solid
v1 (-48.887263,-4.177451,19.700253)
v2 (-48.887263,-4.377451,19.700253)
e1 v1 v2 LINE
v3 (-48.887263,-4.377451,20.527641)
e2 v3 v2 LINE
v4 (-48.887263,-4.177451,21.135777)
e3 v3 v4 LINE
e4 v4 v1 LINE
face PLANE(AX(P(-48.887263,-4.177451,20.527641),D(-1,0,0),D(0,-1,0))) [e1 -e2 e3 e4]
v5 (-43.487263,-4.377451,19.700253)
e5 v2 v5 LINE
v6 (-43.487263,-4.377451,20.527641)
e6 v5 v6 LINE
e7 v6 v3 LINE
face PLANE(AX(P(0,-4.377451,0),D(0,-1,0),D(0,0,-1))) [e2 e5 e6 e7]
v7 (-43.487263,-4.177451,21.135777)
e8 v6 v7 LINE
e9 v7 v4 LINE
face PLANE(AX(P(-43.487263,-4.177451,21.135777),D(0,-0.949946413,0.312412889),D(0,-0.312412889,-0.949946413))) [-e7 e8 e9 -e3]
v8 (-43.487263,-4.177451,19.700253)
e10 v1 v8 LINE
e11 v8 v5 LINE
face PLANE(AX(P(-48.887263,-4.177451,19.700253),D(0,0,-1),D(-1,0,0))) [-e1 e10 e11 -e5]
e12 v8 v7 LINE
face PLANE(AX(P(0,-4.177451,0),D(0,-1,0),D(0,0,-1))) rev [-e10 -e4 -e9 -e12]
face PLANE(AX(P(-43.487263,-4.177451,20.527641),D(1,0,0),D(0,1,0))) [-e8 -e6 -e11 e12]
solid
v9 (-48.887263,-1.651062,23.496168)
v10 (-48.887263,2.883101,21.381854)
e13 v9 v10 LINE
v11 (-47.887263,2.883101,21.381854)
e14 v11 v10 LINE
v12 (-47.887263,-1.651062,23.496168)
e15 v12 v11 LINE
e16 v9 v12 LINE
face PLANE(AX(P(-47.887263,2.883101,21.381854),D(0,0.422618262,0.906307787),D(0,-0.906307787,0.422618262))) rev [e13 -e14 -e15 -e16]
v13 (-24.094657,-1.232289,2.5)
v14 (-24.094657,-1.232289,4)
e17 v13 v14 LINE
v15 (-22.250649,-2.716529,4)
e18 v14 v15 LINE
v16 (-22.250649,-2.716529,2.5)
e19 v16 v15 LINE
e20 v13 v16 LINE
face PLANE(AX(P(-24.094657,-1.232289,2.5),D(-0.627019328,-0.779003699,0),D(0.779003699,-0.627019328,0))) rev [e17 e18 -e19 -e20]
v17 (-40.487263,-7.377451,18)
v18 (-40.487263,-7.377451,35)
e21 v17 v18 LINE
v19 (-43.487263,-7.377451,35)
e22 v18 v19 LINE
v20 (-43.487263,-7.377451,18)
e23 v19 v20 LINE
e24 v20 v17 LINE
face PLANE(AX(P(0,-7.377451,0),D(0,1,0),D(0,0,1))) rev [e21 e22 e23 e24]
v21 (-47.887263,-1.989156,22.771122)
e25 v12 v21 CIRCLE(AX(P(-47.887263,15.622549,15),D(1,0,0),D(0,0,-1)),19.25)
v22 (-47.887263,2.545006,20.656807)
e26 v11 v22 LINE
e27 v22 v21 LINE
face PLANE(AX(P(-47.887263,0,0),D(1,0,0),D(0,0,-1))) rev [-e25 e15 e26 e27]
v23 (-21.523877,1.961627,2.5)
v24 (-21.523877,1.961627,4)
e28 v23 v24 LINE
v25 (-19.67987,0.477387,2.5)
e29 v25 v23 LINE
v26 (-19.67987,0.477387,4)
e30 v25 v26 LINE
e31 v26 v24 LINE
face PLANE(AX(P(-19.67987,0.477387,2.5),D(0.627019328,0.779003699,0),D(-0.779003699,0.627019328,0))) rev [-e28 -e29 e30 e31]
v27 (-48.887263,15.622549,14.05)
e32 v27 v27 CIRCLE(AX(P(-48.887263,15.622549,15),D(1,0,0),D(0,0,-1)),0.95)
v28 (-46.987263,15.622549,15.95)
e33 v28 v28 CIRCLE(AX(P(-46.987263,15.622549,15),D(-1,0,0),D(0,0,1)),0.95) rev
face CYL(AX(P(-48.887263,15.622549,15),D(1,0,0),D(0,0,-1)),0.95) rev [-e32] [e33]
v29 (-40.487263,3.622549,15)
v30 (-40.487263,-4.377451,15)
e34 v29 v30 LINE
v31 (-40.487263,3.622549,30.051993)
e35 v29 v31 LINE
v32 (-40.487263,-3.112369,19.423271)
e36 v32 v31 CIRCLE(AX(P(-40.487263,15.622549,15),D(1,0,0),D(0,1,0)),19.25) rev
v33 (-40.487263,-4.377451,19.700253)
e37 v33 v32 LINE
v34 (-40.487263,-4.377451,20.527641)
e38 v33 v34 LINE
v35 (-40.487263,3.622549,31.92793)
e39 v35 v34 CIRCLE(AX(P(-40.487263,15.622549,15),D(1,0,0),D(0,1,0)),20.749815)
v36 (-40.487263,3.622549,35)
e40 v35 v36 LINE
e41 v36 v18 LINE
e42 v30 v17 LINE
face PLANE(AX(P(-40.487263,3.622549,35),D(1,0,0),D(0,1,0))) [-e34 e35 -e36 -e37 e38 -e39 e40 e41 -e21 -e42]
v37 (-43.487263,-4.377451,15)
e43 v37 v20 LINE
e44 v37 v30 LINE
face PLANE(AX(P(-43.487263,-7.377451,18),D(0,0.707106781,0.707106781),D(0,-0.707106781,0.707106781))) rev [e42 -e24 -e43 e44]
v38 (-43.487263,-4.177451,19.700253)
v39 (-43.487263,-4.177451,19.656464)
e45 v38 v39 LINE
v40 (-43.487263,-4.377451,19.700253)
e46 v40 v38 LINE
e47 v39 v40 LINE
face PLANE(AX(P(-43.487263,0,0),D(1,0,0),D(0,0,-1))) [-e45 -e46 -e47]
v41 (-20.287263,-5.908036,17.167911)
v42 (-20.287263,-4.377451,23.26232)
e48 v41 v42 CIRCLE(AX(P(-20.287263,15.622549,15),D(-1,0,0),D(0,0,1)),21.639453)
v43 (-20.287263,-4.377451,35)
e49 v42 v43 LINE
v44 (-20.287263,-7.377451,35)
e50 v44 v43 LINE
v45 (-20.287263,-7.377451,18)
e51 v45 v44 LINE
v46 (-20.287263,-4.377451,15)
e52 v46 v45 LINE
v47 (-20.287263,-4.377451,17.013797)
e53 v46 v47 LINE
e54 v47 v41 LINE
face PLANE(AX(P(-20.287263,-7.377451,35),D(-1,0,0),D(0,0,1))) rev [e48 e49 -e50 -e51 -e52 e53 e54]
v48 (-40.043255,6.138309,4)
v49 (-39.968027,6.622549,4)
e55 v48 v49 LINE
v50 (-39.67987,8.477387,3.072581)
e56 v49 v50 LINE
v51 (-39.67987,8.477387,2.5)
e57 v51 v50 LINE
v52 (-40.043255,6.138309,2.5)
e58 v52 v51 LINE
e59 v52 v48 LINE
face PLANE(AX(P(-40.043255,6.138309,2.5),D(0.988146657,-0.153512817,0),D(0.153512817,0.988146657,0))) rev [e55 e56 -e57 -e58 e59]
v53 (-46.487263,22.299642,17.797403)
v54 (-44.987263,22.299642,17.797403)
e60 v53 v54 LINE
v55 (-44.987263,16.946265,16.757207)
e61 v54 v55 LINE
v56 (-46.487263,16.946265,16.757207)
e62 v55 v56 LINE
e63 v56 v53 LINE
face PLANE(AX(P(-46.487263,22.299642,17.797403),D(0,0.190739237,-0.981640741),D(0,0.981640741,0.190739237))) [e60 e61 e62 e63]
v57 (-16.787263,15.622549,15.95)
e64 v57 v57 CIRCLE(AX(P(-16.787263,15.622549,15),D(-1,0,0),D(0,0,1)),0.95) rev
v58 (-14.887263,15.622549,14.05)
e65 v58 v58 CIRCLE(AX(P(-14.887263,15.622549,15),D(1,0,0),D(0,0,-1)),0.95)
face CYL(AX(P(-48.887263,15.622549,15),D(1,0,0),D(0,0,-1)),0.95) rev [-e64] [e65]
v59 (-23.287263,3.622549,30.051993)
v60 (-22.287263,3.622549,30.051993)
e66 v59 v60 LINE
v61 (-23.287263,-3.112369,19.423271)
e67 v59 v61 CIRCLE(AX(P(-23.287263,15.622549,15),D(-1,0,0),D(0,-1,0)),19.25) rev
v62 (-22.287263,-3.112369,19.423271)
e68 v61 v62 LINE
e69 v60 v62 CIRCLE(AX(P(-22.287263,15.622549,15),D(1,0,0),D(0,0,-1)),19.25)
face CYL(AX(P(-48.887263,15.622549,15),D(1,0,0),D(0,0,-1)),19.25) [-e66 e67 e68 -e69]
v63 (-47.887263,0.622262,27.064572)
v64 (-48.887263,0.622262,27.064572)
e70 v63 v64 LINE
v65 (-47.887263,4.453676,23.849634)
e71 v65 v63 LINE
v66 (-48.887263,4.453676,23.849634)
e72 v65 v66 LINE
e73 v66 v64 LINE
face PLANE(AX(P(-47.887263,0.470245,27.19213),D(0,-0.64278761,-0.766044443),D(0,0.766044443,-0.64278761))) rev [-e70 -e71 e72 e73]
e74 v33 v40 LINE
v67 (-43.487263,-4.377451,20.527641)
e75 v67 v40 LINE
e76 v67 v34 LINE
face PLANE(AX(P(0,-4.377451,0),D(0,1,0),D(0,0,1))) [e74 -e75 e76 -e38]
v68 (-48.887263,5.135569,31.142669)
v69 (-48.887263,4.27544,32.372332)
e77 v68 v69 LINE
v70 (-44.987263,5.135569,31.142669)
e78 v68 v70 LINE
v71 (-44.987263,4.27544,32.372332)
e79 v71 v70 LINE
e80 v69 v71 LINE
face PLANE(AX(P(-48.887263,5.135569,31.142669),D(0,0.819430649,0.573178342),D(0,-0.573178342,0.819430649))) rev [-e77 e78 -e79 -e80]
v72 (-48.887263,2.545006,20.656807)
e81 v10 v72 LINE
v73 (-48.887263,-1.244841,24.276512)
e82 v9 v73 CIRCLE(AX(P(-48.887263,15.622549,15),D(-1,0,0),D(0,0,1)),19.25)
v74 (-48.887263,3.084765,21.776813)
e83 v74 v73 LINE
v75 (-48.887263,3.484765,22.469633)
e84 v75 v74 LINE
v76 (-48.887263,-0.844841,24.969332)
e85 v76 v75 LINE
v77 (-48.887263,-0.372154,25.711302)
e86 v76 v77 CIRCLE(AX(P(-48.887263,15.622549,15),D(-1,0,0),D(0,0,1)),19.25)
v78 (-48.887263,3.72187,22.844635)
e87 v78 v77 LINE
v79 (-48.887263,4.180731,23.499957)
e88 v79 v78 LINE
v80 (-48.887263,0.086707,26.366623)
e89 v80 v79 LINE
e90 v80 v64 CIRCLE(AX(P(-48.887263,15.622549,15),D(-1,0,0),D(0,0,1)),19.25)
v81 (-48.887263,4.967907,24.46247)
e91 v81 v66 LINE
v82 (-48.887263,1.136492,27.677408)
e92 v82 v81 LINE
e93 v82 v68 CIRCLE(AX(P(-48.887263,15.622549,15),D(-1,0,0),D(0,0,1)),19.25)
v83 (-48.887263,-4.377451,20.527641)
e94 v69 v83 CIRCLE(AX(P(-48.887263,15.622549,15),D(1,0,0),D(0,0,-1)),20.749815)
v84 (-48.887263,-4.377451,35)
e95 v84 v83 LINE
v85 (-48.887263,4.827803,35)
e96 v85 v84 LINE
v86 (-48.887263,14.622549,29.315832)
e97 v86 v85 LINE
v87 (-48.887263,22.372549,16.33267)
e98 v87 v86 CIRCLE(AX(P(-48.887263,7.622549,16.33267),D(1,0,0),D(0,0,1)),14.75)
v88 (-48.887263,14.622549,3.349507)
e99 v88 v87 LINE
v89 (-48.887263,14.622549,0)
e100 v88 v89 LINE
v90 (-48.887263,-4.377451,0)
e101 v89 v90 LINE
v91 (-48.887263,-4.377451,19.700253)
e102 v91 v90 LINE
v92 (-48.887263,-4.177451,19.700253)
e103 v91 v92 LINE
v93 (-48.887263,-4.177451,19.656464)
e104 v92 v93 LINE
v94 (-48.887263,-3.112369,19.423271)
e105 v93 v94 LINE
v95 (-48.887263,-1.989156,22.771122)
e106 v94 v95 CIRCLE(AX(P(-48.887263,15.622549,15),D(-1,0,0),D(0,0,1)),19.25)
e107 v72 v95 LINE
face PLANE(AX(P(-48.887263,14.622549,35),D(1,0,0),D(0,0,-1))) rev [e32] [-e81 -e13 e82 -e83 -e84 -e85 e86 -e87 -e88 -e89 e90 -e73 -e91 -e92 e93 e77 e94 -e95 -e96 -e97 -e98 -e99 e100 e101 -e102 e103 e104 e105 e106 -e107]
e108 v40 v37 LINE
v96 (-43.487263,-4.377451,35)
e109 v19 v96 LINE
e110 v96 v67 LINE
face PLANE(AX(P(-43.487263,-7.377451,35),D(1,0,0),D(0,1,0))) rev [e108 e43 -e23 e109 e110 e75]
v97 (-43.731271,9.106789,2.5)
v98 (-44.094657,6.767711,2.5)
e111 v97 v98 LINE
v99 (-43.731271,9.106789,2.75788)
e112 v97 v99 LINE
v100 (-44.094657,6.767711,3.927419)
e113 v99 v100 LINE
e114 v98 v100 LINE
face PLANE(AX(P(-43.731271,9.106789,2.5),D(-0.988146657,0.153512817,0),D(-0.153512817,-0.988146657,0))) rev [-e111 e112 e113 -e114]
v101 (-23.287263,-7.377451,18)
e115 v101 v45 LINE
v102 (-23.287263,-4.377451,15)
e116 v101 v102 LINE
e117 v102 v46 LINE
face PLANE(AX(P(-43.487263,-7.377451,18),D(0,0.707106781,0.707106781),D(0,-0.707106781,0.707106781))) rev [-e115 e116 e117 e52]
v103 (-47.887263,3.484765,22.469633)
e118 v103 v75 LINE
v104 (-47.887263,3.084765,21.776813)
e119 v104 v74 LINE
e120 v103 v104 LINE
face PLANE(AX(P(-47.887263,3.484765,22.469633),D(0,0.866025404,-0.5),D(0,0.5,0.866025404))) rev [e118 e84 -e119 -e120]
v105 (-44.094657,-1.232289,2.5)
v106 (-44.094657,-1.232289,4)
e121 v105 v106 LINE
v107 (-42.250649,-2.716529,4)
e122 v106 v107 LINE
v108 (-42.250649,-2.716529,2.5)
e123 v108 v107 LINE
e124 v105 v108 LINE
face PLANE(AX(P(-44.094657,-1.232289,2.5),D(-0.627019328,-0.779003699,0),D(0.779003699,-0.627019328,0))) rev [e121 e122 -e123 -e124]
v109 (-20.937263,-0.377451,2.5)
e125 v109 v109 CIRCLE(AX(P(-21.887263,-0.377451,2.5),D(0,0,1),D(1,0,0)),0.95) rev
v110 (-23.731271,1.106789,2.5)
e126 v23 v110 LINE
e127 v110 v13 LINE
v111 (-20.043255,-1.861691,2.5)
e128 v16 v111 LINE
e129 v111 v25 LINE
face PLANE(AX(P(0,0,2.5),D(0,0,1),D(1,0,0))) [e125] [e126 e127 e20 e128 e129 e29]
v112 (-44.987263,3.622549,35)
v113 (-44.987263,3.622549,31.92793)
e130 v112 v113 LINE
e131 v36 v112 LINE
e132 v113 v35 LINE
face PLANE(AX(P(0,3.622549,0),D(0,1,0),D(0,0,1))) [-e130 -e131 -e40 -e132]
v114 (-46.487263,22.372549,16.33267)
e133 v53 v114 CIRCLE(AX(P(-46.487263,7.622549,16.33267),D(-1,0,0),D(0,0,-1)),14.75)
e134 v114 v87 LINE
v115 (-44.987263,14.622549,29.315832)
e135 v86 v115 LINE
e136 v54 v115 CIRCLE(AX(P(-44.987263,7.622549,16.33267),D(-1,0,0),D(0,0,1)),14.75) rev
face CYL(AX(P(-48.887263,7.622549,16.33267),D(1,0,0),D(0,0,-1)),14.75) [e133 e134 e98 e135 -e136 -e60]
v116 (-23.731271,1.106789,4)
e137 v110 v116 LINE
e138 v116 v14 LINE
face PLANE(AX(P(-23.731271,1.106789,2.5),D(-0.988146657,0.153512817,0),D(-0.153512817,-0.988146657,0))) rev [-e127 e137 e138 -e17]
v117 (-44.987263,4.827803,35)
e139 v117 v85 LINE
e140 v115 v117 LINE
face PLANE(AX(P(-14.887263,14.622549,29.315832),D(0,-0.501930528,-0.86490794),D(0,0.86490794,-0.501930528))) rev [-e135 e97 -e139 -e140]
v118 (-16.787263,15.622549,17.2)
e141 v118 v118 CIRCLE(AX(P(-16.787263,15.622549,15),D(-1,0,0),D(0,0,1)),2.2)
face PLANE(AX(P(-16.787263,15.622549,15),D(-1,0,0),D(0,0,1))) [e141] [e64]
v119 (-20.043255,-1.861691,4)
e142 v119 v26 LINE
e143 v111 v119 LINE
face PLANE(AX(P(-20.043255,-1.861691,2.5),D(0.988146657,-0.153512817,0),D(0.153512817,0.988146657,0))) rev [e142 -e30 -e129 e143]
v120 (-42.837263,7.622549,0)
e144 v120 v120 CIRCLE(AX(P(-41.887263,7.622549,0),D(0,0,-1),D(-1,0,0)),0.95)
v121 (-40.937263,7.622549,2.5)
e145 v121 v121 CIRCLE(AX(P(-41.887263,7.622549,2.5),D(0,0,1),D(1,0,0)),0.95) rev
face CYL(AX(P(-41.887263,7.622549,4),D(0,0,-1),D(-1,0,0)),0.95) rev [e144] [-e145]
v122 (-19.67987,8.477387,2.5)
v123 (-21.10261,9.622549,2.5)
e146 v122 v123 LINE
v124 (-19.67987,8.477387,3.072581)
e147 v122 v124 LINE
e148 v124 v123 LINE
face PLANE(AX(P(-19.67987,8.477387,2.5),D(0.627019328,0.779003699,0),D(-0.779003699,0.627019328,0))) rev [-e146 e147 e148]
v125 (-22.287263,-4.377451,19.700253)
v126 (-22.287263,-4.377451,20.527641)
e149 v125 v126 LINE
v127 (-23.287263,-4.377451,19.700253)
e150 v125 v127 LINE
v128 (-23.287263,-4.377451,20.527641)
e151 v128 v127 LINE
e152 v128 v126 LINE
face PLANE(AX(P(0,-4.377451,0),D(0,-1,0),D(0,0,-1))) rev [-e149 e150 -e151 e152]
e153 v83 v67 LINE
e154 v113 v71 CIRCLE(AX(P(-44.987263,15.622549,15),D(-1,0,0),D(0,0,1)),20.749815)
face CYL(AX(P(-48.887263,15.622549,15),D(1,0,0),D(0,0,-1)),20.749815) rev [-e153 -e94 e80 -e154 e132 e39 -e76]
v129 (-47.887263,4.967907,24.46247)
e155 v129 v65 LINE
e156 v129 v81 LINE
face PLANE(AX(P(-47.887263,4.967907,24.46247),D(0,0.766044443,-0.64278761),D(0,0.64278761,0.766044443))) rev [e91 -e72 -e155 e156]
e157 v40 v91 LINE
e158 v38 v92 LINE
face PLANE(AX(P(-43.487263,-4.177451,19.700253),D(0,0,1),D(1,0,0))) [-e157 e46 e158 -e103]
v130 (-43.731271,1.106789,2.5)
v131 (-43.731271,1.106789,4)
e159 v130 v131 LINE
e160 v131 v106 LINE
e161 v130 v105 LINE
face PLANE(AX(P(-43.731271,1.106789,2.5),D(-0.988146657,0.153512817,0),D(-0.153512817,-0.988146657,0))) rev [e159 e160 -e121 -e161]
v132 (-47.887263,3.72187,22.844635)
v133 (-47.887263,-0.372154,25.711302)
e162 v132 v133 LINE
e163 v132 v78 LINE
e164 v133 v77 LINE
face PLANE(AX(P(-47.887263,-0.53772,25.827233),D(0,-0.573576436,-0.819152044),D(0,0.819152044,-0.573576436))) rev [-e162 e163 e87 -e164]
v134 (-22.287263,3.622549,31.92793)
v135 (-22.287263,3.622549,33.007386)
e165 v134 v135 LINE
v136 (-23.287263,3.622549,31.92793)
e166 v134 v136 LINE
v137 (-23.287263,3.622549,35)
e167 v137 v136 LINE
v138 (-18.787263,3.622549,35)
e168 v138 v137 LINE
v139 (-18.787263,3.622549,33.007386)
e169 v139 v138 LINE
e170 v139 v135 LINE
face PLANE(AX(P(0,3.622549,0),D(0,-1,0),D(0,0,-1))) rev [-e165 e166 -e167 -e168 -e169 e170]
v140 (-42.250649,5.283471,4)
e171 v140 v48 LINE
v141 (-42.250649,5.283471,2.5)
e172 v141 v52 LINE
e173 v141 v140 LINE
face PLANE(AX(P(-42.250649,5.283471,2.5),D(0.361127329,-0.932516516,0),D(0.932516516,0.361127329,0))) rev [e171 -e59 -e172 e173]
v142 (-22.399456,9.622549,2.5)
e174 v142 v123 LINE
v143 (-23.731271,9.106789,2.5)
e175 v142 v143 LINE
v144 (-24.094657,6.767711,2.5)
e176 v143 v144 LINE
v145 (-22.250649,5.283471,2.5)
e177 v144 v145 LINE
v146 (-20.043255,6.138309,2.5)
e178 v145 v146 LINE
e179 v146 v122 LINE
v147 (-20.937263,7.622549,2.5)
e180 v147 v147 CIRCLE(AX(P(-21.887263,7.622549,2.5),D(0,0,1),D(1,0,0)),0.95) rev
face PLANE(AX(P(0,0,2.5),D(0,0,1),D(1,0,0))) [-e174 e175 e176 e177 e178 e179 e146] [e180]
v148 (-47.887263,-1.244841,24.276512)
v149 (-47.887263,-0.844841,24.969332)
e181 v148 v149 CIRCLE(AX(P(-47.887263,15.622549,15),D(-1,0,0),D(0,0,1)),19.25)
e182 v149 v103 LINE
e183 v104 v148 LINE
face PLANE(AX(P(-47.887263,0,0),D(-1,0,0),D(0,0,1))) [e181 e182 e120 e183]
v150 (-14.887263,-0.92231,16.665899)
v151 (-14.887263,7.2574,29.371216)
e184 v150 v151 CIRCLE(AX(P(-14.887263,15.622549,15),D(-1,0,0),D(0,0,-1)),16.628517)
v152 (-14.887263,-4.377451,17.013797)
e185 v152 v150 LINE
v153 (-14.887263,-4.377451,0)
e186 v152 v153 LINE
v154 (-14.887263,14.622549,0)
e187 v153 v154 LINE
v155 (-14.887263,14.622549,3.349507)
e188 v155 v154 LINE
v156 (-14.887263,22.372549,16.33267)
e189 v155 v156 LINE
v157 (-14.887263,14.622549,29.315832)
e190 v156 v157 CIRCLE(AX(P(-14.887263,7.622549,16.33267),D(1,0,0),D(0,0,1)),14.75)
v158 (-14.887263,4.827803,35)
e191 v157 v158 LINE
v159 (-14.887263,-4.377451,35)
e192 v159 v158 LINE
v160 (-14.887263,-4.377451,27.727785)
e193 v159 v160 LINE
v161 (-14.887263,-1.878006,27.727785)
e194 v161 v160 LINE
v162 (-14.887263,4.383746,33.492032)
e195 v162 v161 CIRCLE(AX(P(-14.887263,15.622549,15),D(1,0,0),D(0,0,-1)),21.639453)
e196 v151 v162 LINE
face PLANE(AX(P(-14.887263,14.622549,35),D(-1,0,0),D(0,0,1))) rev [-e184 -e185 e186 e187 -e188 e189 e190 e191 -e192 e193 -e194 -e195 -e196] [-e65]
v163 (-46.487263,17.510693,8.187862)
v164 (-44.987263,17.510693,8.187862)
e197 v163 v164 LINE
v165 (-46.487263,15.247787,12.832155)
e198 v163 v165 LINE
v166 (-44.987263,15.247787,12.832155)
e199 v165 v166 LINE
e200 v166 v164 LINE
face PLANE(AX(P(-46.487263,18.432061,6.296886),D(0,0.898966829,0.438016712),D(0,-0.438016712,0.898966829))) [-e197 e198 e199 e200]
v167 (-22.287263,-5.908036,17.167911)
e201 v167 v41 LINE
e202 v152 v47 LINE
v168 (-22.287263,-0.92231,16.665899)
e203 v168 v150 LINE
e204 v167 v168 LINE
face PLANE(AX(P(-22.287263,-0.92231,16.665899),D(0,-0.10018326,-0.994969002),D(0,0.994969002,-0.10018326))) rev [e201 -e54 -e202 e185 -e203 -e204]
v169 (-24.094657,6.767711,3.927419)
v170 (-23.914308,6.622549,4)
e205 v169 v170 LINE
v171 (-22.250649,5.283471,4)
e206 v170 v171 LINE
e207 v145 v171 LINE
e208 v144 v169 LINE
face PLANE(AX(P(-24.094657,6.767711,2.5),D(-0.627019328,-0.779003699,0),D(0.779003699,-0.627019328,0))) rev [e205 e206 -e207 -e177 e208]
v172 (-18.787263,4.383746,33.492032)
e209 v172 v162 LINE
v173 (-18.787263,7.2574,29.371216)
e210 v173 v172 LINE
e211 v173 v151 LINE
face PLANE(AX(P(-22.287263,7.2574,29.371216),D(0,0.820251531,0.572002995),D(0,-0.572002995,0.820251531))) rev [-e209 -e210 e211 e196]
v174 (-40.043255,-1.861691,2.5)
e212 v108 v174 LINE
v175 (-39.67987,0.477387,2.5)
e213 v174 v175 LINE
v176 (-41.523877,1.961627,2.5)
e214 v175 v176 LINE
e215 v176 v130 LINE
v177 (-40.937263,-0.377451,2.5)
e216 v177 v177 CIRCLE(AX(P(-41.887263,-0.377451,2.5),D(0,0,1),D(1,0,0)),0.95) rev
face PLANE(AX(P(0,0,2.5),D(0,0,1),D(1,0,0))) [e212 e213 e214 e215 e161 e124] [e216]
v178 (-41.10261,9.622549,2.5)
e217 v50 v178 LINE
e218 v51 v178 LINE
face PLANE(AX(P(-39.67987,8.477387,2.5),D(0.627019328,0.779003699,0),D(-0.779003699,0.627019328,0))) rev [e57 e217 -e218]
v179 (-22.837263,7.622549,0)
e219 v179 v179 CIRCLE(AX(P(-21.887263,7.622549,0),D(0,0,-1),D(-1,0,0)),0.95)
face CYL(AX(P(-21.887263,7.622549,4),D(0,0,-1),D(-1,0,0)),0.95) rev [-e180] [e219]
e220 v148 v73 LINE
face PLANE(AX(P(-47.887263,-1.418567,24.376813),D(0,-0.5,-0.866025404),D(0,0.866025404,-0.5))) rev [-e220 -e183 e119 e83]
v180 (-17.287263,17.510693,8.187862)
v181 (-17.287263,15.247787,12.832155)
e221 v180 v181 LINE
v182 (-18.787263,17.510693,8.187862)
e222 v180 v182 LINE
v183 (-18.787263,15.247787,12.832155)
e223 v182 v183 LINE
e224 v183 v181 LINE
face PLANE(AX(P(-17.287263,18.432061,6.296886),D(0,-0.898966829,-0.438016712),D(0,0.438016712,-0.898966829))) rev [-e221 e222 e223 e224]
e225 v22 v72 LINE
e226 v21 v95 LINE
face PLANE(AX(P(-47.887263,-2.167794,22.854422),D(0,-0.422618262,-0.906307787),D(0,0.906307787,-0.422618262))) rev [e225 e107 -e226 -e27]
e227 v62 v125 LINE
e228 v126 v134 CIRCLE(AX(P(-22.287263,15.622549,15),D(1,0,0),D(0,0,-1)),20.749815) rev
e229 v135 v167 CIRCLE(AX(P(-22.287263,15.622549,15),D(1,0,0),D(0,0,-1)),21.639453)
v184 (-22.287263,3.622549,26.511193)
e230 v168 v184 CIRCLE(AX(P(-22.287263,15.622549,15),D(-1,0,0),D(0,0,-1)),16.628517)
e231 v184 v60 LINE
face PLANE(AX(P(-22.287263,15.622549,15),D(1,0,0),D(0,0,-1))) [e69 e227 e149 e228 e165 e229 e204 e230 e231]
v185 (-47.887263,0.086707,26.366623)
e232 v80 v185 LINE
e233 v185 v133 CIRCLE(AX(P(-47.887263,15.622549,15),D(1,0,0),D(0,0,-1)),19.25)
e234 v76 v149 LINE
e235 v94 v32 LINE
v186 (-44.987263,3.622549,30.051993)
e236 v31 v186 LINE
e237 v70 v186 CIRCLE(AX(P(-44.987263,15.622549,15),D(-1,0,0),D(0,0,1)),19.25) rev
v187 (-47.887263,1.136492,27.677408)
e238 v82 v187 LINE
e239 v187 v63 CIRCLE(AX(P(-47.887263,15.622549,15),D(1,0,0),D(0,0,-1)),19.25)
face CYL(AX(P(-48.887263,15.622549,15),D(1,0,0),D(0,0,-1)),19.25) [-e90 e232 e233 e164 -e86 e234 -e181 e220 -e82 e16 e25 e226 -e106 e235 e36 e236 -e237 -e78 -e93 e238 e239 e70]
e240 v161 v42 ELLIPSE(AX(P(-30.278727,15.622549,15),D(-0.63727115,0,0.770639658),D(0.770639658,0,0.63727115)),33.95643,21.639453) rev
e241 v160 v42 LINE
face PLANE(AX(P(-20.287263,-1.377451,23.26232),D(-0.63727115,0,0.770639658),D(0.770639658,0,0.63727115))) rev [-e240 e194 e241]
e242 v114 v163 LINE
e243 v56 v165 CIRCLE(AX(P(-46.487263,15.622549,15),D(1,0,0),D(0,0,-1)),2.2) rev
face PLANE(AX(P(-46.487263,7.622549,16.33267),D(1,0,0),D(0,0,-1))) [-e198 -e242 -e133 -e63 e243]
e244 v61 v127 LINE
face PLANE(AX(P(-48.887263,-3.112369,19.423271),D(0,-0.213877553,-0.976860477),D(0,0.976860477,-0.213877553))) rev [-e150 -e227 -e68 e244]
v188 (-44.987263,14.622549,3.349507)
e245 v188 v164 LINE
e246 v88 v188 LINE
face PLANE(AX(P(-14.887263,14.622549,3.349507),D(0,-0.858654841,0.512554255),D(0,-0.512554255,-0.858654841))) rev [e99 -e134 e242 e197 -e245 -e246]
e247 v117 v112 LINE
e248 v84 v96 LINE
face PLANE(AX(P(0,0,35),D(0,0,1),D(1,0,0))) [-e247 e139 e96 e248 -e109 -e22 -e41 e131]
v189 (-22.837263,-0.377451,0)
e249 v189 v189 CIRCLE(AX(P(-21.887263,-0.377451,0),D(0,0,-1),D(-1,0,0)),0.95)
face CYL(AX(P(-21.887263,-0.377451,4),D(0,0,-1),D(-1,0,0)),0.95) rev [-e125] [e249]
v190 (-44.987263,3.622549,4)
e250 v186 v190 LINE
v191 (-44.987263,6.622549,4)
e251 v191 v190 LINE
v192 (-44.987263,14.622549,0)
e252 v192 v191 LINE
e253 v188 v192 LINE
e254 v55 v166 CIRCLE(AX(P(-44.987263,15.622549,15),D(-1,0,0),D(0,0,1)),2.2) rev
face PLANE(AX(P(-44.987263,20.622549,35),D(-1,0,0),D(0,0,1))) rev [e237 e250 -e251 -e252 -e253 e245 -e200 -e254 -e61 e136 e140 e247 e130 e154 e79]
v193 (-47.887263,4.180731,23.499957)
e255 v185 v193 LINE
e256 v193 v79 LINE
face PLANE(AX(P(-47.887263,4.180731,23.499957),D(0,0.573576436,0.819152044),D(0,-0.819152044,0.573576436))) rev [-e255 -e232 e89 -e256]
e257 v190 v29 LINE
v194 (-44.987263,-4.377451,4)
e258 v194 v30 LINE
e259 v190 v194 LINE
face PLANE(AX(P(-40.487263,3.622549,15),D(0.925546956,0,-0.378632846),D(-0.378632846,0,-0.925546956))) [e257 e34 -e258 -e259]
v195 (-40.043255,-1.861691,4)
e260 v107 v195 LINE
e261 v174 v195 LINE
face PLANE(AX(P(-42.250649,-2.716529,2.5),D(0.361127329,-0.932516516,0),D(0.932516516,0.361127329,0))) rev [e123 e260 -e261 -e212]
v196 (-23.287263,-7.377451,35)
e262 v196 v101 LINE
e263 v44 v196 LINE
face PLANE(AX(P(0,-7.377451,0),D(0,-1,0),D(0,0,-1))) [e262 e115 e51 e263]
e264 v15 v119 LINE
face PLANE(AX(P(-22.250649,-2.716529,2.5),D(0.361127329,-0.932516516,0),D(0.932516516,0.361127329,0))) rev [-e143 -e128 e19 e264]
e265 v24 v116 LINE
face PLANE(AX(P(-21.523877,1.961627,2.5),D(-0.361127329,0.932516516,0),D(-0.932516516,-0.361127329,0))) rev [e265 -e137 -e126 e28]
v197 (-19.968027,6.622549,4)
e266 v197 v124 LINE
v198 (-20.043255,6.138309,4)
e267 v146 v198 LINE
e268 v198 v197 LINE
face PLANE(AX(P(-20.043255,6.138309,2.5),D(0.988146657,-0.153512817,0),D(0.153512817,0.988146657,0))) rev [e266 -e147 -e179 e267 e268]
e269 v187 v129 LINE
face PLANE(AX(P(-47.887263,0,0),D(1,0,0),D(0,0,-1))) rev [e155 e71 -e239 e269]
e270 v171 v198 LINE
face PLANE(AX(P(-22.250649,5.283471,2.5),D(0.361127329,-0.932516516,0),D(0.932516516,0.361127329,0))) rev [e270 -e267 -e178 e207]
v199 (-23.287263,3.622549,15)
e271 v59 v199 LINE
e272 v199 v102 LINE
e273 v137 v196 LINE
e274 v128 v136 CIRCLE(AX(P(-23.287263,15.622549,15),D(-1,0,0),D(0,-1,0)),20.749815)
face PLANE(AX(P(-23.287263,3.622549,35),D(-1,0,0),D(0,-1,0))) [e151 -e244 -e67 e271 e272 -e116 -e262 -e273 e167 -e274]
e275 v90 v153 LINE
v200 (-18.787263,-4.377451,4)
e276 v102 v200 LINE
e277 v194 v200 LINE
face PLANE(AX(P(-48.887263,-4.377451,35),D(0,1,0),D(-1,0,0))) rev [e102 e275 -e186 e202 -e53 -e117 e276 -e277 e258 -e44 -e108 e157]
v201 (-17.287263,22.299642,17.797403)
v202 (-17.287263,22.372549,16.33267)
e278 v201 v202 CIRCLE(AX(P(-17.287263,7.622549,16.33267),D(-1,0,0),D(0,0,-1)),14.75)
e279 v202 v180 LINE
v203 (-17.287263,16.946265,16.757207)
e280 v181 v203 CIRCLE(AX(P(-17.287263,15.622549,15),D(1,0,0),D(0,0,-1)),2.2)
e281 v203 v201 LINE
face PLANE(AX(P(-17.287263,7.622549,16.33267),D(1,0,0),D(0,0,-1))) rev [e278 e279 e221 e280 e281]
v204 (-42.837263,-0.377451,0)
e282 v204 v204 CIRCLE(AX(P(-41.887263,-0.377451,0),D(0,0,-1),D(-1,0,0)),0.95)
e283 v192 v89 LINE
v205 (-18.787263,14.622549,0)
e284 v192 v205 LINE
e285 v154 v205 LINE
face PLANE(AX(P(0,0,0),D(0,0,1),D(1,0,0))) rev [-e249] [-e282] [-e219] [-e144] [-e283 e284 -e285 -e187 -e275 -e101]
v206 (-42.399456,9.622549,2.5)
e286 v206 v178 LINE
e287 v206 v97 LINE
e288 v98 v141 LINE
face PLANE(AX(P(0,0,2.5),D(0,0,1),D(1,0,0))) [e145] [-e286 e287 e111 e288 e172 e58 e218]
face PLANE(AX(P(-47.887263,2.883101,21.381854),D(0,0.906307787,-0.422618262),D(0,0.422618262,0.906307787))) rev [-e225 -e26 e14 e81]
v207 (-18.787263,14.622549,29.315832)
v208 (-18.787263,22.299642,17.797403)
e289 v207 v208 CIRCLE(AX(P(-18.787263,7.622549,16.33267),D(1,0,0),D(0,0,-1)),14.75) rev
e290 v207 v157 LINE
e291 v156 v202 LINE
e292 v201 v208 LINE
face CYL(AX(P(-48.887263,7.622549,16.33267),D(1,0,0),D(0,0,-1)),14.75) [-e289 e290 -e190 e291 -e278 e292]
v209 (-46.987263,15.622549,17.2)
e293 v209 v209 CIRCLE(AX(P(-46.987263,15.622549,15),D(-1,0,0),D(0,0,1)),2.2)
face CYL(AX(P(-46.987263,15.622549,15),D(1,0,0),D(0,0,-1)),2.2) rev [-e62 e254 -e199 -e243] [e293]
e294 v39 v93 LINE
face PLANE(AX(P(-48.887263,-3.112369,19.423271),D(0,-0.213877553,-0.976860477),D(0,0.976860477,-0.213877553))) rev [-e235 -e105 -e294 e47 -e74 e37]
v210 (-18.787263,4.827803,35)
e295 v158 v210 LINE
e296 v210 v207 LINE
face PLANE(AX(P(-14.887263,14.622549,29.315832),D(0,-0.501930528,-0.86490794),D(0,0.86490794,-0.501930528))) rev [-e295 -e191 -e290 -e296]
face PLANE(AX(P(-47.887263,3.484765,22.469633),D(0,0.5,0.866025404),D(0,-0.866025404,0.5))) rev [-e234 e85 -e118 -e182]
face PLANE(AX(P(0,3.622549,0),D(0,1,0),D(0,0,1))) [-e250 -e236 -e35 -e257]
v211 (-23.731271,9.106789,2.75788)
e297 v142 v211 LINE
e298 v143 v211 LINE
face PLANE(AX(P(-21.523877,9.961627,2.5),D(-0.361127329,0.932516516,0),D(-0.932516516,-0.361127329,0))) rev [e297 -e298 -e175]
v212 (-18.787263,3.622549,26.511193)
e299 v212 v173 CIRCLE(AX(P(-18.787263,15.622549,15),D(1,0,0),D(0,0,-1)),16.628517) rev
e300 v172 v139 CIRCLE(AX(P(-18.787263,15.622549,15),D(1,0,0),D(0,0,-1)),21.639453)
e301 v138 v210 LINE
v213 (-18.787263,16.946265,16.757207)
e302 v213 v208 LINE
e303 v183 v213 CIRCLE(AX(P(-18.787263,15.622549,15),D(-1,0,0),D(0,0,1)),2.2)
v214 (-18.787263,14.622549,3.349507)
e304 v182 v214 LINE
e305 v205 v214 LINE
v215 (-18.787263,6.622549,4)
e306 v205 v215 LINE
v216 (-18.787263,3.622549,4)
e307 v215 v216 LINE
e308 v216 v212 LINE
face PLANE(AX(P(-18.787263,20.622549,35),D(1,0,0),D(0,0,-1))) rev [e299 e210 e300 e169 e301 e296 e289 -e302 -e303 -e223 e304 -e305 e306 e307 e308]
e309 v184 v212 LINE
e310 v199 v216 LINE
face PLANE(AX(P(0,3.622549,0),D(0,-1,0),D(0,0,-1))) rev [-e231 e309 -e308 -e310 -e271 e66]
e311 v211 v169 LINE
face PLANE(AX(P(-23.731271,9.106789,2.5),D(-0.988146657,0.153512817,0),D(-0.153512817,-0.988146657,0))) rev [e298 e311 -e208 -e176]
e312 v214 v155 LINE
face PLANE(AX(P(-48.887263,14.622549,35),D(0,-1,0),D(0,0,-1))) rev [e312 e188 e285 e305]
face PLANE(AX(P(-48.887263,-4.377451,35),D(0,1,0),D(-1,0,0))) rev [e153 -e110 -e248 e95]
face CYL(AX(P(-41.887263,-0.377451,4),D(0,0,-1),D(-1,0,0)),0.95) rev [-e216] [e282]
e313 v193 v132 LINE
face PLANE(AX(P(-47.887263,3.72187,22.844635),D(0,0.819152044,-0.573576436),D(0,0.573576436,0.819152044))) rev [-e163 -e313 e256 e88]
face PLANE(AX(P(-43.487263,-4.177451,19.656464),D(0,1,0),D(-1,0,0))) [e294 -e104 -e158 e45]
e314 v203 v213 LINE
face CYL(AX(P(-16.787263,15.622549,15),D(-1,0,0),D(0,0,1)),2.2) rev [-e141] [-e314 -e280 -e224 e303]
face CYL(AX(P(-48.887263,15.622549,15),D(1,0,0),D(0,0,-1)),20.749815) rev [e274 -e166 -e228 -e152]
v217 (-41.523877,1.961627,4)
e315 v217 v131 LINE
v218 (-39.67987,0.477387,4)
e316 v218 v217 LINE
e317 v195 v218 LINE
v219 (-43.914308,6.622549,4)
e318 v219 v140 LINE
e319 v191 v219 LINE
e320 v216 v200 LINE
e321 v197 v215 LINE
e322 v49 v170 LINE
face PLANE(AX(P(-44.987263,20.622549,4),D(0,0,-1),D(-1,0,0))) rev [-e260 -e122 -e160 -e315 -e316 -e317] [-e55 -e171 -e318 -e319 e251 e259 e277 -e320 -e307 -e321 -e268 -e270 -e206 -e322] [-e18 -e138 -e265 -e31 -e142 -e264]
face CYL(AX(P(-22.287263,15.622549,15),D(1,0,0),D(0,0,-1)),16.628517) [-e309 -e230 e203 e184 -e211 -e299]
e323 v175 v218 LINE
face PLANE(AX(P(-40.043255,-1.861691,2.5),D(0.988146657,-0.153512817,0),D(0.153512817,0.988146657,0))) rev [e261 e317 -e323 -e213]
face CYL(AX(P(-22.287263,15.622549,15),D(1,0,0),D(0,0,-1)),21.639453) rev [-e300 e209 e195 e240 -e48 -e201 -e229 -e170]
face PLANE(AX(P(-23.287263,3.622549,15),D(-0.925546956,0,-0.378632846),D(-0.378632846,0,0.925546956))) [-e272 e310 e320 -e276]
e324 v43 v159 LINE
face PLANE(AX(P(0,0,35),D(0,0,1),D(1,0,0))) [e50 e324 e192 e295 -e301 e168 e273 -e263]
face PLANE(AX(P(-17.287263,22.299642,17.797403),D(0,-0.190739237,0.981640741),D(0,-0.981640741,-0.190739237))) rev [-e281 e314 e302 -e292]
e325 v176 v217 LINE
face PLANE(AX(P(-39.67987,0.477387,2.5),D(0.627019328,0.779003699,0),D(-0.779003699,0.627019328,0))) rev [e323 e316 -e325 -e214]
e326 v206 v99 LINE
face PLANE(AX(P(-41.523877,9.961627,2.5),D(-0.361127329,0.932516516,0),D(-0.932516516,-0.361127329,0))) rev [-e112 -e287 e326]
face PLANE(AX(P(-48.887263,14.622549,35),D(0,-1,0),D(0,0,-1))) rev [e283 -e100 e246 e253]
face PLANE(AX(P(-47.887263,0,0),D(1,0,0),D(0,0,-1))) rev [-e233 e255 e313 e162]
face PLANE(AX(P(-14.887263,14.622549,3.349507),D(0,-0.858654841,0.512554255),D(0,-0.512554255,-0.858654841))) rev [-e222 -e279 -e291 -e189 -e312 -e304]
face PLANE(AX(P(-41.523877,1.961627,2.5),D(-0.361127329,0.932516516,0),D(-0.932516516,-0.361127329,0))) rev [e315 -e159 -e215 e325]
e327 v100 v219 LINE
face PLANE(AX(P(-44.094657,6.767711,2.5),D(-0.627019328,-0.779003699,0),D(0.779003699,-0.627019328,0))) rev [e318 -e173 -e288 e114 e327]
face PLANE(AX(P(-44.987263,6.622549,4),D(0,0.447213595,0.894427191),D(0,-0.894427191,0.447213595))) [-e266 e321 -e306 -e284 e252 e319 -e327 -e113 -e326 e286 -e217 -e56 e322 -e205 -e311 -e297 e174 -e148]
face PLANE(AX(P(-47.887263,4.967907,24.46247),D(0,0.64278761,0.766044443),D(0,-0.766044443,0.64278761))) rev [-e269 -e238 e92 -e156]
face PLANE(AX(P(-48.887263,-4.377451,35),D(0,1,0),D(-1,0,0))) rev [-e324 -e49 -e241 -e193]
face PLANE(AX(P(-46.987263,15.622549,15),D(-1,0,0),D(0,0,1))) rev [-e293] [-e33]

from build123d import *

# Parameters (mm, degrees)
CROQUIS1_W                = 34
CROQUIS1_H                = 19
SALIENTE_EXTRUIR1_DEPTH   = 35
CROQUIS2_W                = 26.2
CROQUIS2_H                = 31
CORTAR_EXTRUIR1_DEPTH     = 25
CORTAR_EXTRUIR3_DEPTH     = 26.2
SALIENTE_EXTRUIR2_DEPTH   = 34
CROQUIS10_W               = 26.2
CROQUIS10_H               = 25.966324345
CORTAR_EXTRUIR4_DEPTH     = 10
CROQUIS18_R               = 0.95
CORTAR_EXTRUIR11_DEPTH    = 4
CORTAR_EXTRUIR12_DEPTH    = 1.5
CORTAR_EXTRUIR14_START    = -34
CROQUIS21_R               = 0.95
CORTAR_EXTRUIR14_DEPTH    = 34
SALIENTE_EXTRUIR3_DEPTH   = 8
CORTAR_EXTRUIR16_START    = -34
CORTAR_EXTRUIR16_DEPTH    = 34
CROQUIS25_W               = 3
CROQUIS25_H               = 20
SALIENTE_EXTRUIR4_DEPTH   = 3
CORTAR_EXTRUIR17_START    = -23.2
CORTAR_EXTRUIR17_DEPTH    = 23.2
CORTAR_EXTRUIR18_DEPTH    = 7.4
CORTAR_EXTRUIR20_START    = -1.5
CORTAR_EXTRUIR20_DEPTH    = 1.5
CORTAR_EXTRUIR21_DEPTH    = 27.7
CORTAR_EXTRUIR22_START    = -34
CORTAR_EXTRUIR22_DEPTH    = 34
CROQUIS33_W               = 5.4
CROQUIS33_H               = 0.827388273
SALIENTE_EXTRUIR5_DEPTH   = 0.2
SALIENTE_EXTRUIR6_START   = -5.4
SALIENTE_EXTRUIR6_DEPTH   = 5.4
SALIENTE_EXTRUIR6_2_DEPTH = 5.4
CORTAR_EXTRUIR23_DEPTH    = 3
CROQUIS36_R               = 2.2
CORTAR_EXTRUIR24_DEPTH    = 2
CORTAR_EXTRUIR25_START    = 28.2
CROQUIS36_2_R             = 2.2
CORTAR_EXTRUIR25_DEPTH    = 28.2
CORTAR_EXTRUIR26_START    = -34
CORTAR_EXTRUIR26_DEPTH    = 34
CORTAR_EXTRUIR27_DEPTH    = 1


# Read off the part's stored shape, not the designer's step: Saliente-Extruir6
with BuildPart() as part:
    # Croquis1 → Saliente-Extruir1 (new body)
    with BuildSketch(Plane.XY):
        with Locations((-31.887263086, 5.12254902)):
            Rectangle(CROQUIS1_W, CROQUIS1_H)
    extrude(amount=SALIENTE_EXTRUIR1_DEPTH)

    # Croquis2 → Cortar-Extruir1 (cut)
    with BuildSketch(Plane.XZ.offset(4.37745098)):
        with Locations((-31.887263086, 19.5)):
            Rectangle(CROQUIS2_W, CROQUIS2_H)
    extrude(amount=-CORTAR_EXTRUIR1_DEPTH, mode=Mode.SUBTRACT)

    # Croquis4 → Cortar-Extruir3 (cut)
    with BuildSketch(Plane.ZY.offset(18.787263086)):
        Polygon((4, 14.62254902), (4, 6.62254902), (0, 14.62254902), align=None)
    extrude(amount=CORTAR_EXTRUIR3_DEPTH, mode=Mode.SUBTRACT)

    # Croquis9 → Saliente-Extruir2 (add)
    with BuildSketch(Plane(origin=(-14.887263086, 0, 0), x_dir=(0, 0, -1), z_dir=(1, 0, 0))):
        with BuildLine():
            Line((-29.315831827, 14.62254902), (-3.349507482, 14.62254902))
            ThreePointArc((-3.349507482, 14.62254902), (-16.332669655, 22.37254902), (-29.315831827, 14.62254902))
        make_face()
    extrude(amount=-SALIENTE_EXTRUIR2_DEPTH)

    # Croquis10 → Cortar-Extruir4 (cut)
    with BuildSketch(Plane.XZ.offset(-14.62254902)):
        with Locations((-31.887263086, 16.332669655)):
            Rectangle(CROQUIS10_W, CROQUIS10_H)
    extrude(amount=-CORTAR_EXTRUIR4_DEPTH, mode=Mode.SUBTRACT)

    # Croquis18 → Cortar-Extruir11 (cut)
    with BuildSketch(Plane(origin=(0, 0, 0), x_dir=(-1, 0, 0), z_dir=(0, 0, -1))):
        with Locations((41.887263086, -0.37745098)):
            Circle(CROQUIS18_R)
        with Locations((21.887263086, -0.37745098)):
            Circle(CROQUIS18_R)
        with Locations((21.887263086, 7.62254902)):
            Circle(CROQUIS18_R)
        with Locations((41.887263086, 7.62254902)):
            Circle(CROQUIS18_R)
    extrude(amount=-CORTAR_EXTRUIR11_DEPTH, mode=Mode.SUBTRACT)

    # Croquis19 → Cortar-Extruir12 (cut)
    with BuildSketch(Plane.XY.offset(4)):
        Polygon((-43.731270866, 1.106789108), (-44.094656598, -1.232288518), (-42.250648818, -2.716528607), (-40.043255306, -1.861691069), (-39.679869573, 0.477386558), (-41.523877353, 1.961626646), align=None)
        Polygon((-23.731270866, 1.106789108), (-24.094656598, -1.232288518), (-22.250648818, -2.716528607), (-20.043255306, -1.861691069), (-19.679869573, 0.477386558), (-21.523877353, 1.961626646), align=None)
        Polygon((-43.731270866, 9.106789108), (-44.094656598, 6.767711482), (-42.250648818, 5.283471393), (-40.043255306, 6.138308931), (-39.679869573, 8.477386558), (-41.523877353, 9.961626646), align=None)
        Polygon((-23.731270866, 9.106789108), (-24.094656598, 6.767711482), (-22.250648818, 5.283471393), (-20.043255306, 6.138308931), (-19.679869573, 8.477386558), (-21.523877353, 9.961626646), align=None)
    extrude(amount=-CORTAR_EXTRUIR12_DEPTH, mode=Mode.SUBTRACT)

    # Croquis21 → Cortar-Extruir14 (cut)
    with BuildSketch(Plane(origin=(-14.887263086, 0, 0), x_dir=(0, 0, -1), z_dir=(1, 0, 0)).offset(CORTAR_EXTRUIR14_START)):
        with Locations((-15, 15.62254902)):
            Circle(CROQUIS21_R)
    extrude(amount=CORTAR_EXTRUIR14_DEPTH, mode=Mode.SUBTRACT)

    # Croquis23 → Saliente-Extruir3 (add)
    with BuildSketch(Plane.XZ.offset(4.37745098)):
        Polygon((-44.987263086, 35), (-40.487263086, 35), (-40.487263086, 15), (-44.987263086, 4), align=None)
        Polygon((-18.787263086, 35), (-23.287263086, 35), (-23.287263086, 15), (-18.787263086, 4), align=None)
    extrude(amount=-SALIENTE_EXTRUIR3_DEPTH)

    # Croquis24 → Cortar-Extruir16 (cut)
    with BuildSketch(Plane(origin=(-14.887263086, 0, 0), x_dir=(0, 0, -1), z_dir=(1, 0, 0)).offset(CORTAR_EXTRUIR16_START)):
        with BuildLine():
            Line((-19.423271375, -3.112369457), (-19.744087704, -4.577660174))
            ThreePointArc((-19.744087704, -4.577660174), (-26.911270078, -1.367932572), (-32.372332418, 4.275439874))
            Line((-32.372332418, 4.275439874), (-31.142668885, 5.135569413))
            ThreePointArc((-31.142668885, 5.135569413), (-26.079106399, -0.119620507), (-19.423271375, -3.112369457))
        make_face()
    extrude(amount=CORTAR_EXTRUIR16_DEPTH, mode=Mode.SUBTRACT)

    # Croquis25 → Saliente-Extruir4 (add)
    with BuildSketch(Plane.XZ.offset(4.37745098)):
        with Locations((-21.787263086, 25)):
            Rectangle(CROQUIS25_W, CROQUIS25_H)
        with Locations((-41.987263086, 25)):
            Rectangle(CROQUIS25_W, CROQUIS25_H)
    extrude(amount=SALIENTE_EXTRUIR4_DEPTH)

    # Croquis26 → Cortar-Extruir17 (cut)
    with BuildSketch(Plane(origin=(-20.287263086, 0, 0), x_dir=(0, 0, -1), z_dir=(1, 0, 0)).offset(CORTAR_EXTRUIR17_START)):
        Polygon((-18, -7.37745098), (-15, -7.37745098), (-15, -4.37745098), align=None)
    extrude(amount=CORTAR_EXTRUIR17_DEPTH, mode=Mode.SUBTRACT)

    # Croquis27 → Cortar-Extruir18 (cut)
    with BuildSketch(Plane(origin=(-14.887263086, 0, 0), x_dir=(0, 0, -1), z_dir=(1, 0, 0))):
        with BuildLine():
            Line((-16.665899018, -0.922309645), (-17.167910976, -5.908036155))
            ThreePointArc((-17.167910976, -5.908036155), (-26.540732538, -2.68257126), (-33.492032026, 4.383746258))
            Line((-33.492032026, 4.383746258), (-29.371216121, 7.25740019))
            ThreePointArc((-29.371216121, 7.25740019), (-24.001343163, 1.641011586), (-16.665899018, -0.922309645))
        make_face()
    extrude(amount=-CORTAR_EXTRUIR18_DEPTH, mode=Mode.SUBTRACT)

    # Croquis29 → Cortar-Extruir20 (cut)
    with BuildSketch(Plane.ZY.offset(18.787263086).offset(CORTAR_EXTRUIR20_START)):
        with BuildLine():
            Line((17.797402962, 22.299641931), (16.5, 15.62254902))
            ThreePointArc((16.5, 15.62254902), (15.426958984, 14.184596995), (13.743058632, 14.803953638))
            Line((13.743058632, 14.803953638), (6.296886003, 18.432060872))
            ThreePointArc((6.296886003, 18.432060872), (11.631045274, 21.603150873), (17.797402962, 22.299641931))
        make_face()
    extrude(amount=CORTAR_EXTRUIR20_DEPTH, mode=Mode.SUBTRACT)

    # Croquis29<2> → Cortar-Extruir21 (cut)
    with BuildSketch(Plane.ZY.offset(18.787263086)):
        with BuildLine():
            Line((17.797402962, 22.299641931), (16.5, 15.62254902))
            ThreePointArc((16.5, 15.62254902), (15.426958984, 14.184596995), (13.743058632, 14.803953638))
            Line((13.743058632, 14.803953638), (6.296886003, 18.432060872))
            ThreePointArc((6.296886003, 18.432060872), (11.631045274, 21.603150873), (17.797402962, 22.299641931))
        make_face()
    extrude(amount=CORTAR_EXTRUIR21_DEPTH, mode=Mode.SUBTRACT)

    # Croquis30 → Cortar-Extruir22 (cut)
    with BuildSketch(Plane.ZY.offset(48.887263086).offset(CORTAR_EXTRUIR22_START)):
        Polygon((29.315831827, 14.62254902), (35, 4.827802707), (35, 14.62254902), align=None)
    extrude(amount=CORTAR_EXTRUIR22_DEPTH, mode=Mode.SUBTRACT)

    # Saliente-Extruir6 2 outline → Saliente-Extruir6 2 (add)
    with BuildSketch(Plane.ZY.offset(48.887263086).offset(SALIENTE_EXTRUIR6_START)):
        Polygon((19.700253141, -4.37745098), (19.700253141, -4.17745098), (19.656464379, -4.17745098), align=None)
    extrude(amount=SALIENTE_EXTRUIR6_2_DEPTH)

    # Croquis35 → Cortar-Extruir23 (cut)
    with BuildSketch(Plane.XZ.offset(4.37745098)):
        Polygon((-20.287263086, 23.262320252), (-14.887263086, 27.727784977), (-14.887263086, 23.262320252), align=None)
    extrude(amount=-CORTAR_EXTRUIR23_DEPTH, mode=Mode.SUBTRACT)

    # Croquis36 → Cortar-Extruir24 (cut)
    with BuildSketch(Plane.ZY.offset(18.787263086)):
        with Locations((15, 15.62254902)):
            Circle(CROQUIS36_R)
    extrude(amount=-CORTAR_EXTRUIR24_DEPTH, mode=Mode.SUBTRACT)

    # Croquis36<2> → Cortar-Extruir25 (cut)
    with BuildSketch(Plane.ZY.offset(18.787263086).offset(CORTAR_EXTRUIR25_START)):
        with Locations((15, 15.62254902)):
            Circle(CROQUIS36_2_R)
    extrude(amount=-CORTAR_EXTRUIR25_DEPTH, mode=Mode.SUBTRACT)

    # Croquis38 → Cortar-Extruir26 (cut)
    with BuildSketch(Plane.ZY.offset(48.887263086).offset(CORTAR_EXTRUIR26_START)):
        Polygon((3.349507482, 14.62254902), (16.332669655, 22.37254902), (3.349507482, 22.37254902), align=None)
    extrude(amount=CORTAR_EXTRUIR26_DEPTH, mode=Mode.SUBTRACT)

    # Croquis40 → Cortar-Extruir27 (cut)
    with BuildSketch(Plane.ZY.offset(48.887263086)):
        Polygon((24.462469518, 4.967906508), (27.804965088, 0.984475403), (27.192129534, 0.470245316), (23.849633963, 4.45367642), align=None)
        Polygon((23.499956861, 4.180731289), (26.48255433, -0.078859342), (25.827232695, -0.537720491), (22.844635226, 3.72187014), align=None)
        Polygon((22.469633136, 3.484764914), (25.069633136, -1.018567186), (24.376812813, -1.418567186), (21.776812813, 3.084764914), align=None)
        Polygon((21.381853505, 2.883100647), (23.579468466, -1.829699846), (22.854422236, -2.167794455), (20.656807275, 2.545006037), align=None)
    extrude(amount=-CORTAR_EXTRUIR27_DEPTH, mode=Mode.SUBTRACT)


with BuildPart() as body_2:
    # Croquis33 → Saliente-Extruir5 (new body)
    with BuildSketch(Plane.XZ.offset(4.37745098)):
        with Locations((-46.187263086, 20.113947278)):
            Rectangle(CROQUIS33_W, CROQUIS33_H)
    extrude(amount=-SALIENTE_EXTRUIR5_DEPTH)

    # Saliente-Extruir6 outline → Saliente-Extruir6 (add)
    with BuildSketch(Plane.ZY.offset(48.887263086).offset(SALIENTE_EXTRUIR6_START)):
        Polygon((21.135776638, -4.17745098), (20.527641414, -4.17745098), (20.527641414, -4.37745098), align=None)
    extrude(amount=SALIENTE_EXTRUIR6_DEPTH)


solid = Compound([part.part, body_2.part])
